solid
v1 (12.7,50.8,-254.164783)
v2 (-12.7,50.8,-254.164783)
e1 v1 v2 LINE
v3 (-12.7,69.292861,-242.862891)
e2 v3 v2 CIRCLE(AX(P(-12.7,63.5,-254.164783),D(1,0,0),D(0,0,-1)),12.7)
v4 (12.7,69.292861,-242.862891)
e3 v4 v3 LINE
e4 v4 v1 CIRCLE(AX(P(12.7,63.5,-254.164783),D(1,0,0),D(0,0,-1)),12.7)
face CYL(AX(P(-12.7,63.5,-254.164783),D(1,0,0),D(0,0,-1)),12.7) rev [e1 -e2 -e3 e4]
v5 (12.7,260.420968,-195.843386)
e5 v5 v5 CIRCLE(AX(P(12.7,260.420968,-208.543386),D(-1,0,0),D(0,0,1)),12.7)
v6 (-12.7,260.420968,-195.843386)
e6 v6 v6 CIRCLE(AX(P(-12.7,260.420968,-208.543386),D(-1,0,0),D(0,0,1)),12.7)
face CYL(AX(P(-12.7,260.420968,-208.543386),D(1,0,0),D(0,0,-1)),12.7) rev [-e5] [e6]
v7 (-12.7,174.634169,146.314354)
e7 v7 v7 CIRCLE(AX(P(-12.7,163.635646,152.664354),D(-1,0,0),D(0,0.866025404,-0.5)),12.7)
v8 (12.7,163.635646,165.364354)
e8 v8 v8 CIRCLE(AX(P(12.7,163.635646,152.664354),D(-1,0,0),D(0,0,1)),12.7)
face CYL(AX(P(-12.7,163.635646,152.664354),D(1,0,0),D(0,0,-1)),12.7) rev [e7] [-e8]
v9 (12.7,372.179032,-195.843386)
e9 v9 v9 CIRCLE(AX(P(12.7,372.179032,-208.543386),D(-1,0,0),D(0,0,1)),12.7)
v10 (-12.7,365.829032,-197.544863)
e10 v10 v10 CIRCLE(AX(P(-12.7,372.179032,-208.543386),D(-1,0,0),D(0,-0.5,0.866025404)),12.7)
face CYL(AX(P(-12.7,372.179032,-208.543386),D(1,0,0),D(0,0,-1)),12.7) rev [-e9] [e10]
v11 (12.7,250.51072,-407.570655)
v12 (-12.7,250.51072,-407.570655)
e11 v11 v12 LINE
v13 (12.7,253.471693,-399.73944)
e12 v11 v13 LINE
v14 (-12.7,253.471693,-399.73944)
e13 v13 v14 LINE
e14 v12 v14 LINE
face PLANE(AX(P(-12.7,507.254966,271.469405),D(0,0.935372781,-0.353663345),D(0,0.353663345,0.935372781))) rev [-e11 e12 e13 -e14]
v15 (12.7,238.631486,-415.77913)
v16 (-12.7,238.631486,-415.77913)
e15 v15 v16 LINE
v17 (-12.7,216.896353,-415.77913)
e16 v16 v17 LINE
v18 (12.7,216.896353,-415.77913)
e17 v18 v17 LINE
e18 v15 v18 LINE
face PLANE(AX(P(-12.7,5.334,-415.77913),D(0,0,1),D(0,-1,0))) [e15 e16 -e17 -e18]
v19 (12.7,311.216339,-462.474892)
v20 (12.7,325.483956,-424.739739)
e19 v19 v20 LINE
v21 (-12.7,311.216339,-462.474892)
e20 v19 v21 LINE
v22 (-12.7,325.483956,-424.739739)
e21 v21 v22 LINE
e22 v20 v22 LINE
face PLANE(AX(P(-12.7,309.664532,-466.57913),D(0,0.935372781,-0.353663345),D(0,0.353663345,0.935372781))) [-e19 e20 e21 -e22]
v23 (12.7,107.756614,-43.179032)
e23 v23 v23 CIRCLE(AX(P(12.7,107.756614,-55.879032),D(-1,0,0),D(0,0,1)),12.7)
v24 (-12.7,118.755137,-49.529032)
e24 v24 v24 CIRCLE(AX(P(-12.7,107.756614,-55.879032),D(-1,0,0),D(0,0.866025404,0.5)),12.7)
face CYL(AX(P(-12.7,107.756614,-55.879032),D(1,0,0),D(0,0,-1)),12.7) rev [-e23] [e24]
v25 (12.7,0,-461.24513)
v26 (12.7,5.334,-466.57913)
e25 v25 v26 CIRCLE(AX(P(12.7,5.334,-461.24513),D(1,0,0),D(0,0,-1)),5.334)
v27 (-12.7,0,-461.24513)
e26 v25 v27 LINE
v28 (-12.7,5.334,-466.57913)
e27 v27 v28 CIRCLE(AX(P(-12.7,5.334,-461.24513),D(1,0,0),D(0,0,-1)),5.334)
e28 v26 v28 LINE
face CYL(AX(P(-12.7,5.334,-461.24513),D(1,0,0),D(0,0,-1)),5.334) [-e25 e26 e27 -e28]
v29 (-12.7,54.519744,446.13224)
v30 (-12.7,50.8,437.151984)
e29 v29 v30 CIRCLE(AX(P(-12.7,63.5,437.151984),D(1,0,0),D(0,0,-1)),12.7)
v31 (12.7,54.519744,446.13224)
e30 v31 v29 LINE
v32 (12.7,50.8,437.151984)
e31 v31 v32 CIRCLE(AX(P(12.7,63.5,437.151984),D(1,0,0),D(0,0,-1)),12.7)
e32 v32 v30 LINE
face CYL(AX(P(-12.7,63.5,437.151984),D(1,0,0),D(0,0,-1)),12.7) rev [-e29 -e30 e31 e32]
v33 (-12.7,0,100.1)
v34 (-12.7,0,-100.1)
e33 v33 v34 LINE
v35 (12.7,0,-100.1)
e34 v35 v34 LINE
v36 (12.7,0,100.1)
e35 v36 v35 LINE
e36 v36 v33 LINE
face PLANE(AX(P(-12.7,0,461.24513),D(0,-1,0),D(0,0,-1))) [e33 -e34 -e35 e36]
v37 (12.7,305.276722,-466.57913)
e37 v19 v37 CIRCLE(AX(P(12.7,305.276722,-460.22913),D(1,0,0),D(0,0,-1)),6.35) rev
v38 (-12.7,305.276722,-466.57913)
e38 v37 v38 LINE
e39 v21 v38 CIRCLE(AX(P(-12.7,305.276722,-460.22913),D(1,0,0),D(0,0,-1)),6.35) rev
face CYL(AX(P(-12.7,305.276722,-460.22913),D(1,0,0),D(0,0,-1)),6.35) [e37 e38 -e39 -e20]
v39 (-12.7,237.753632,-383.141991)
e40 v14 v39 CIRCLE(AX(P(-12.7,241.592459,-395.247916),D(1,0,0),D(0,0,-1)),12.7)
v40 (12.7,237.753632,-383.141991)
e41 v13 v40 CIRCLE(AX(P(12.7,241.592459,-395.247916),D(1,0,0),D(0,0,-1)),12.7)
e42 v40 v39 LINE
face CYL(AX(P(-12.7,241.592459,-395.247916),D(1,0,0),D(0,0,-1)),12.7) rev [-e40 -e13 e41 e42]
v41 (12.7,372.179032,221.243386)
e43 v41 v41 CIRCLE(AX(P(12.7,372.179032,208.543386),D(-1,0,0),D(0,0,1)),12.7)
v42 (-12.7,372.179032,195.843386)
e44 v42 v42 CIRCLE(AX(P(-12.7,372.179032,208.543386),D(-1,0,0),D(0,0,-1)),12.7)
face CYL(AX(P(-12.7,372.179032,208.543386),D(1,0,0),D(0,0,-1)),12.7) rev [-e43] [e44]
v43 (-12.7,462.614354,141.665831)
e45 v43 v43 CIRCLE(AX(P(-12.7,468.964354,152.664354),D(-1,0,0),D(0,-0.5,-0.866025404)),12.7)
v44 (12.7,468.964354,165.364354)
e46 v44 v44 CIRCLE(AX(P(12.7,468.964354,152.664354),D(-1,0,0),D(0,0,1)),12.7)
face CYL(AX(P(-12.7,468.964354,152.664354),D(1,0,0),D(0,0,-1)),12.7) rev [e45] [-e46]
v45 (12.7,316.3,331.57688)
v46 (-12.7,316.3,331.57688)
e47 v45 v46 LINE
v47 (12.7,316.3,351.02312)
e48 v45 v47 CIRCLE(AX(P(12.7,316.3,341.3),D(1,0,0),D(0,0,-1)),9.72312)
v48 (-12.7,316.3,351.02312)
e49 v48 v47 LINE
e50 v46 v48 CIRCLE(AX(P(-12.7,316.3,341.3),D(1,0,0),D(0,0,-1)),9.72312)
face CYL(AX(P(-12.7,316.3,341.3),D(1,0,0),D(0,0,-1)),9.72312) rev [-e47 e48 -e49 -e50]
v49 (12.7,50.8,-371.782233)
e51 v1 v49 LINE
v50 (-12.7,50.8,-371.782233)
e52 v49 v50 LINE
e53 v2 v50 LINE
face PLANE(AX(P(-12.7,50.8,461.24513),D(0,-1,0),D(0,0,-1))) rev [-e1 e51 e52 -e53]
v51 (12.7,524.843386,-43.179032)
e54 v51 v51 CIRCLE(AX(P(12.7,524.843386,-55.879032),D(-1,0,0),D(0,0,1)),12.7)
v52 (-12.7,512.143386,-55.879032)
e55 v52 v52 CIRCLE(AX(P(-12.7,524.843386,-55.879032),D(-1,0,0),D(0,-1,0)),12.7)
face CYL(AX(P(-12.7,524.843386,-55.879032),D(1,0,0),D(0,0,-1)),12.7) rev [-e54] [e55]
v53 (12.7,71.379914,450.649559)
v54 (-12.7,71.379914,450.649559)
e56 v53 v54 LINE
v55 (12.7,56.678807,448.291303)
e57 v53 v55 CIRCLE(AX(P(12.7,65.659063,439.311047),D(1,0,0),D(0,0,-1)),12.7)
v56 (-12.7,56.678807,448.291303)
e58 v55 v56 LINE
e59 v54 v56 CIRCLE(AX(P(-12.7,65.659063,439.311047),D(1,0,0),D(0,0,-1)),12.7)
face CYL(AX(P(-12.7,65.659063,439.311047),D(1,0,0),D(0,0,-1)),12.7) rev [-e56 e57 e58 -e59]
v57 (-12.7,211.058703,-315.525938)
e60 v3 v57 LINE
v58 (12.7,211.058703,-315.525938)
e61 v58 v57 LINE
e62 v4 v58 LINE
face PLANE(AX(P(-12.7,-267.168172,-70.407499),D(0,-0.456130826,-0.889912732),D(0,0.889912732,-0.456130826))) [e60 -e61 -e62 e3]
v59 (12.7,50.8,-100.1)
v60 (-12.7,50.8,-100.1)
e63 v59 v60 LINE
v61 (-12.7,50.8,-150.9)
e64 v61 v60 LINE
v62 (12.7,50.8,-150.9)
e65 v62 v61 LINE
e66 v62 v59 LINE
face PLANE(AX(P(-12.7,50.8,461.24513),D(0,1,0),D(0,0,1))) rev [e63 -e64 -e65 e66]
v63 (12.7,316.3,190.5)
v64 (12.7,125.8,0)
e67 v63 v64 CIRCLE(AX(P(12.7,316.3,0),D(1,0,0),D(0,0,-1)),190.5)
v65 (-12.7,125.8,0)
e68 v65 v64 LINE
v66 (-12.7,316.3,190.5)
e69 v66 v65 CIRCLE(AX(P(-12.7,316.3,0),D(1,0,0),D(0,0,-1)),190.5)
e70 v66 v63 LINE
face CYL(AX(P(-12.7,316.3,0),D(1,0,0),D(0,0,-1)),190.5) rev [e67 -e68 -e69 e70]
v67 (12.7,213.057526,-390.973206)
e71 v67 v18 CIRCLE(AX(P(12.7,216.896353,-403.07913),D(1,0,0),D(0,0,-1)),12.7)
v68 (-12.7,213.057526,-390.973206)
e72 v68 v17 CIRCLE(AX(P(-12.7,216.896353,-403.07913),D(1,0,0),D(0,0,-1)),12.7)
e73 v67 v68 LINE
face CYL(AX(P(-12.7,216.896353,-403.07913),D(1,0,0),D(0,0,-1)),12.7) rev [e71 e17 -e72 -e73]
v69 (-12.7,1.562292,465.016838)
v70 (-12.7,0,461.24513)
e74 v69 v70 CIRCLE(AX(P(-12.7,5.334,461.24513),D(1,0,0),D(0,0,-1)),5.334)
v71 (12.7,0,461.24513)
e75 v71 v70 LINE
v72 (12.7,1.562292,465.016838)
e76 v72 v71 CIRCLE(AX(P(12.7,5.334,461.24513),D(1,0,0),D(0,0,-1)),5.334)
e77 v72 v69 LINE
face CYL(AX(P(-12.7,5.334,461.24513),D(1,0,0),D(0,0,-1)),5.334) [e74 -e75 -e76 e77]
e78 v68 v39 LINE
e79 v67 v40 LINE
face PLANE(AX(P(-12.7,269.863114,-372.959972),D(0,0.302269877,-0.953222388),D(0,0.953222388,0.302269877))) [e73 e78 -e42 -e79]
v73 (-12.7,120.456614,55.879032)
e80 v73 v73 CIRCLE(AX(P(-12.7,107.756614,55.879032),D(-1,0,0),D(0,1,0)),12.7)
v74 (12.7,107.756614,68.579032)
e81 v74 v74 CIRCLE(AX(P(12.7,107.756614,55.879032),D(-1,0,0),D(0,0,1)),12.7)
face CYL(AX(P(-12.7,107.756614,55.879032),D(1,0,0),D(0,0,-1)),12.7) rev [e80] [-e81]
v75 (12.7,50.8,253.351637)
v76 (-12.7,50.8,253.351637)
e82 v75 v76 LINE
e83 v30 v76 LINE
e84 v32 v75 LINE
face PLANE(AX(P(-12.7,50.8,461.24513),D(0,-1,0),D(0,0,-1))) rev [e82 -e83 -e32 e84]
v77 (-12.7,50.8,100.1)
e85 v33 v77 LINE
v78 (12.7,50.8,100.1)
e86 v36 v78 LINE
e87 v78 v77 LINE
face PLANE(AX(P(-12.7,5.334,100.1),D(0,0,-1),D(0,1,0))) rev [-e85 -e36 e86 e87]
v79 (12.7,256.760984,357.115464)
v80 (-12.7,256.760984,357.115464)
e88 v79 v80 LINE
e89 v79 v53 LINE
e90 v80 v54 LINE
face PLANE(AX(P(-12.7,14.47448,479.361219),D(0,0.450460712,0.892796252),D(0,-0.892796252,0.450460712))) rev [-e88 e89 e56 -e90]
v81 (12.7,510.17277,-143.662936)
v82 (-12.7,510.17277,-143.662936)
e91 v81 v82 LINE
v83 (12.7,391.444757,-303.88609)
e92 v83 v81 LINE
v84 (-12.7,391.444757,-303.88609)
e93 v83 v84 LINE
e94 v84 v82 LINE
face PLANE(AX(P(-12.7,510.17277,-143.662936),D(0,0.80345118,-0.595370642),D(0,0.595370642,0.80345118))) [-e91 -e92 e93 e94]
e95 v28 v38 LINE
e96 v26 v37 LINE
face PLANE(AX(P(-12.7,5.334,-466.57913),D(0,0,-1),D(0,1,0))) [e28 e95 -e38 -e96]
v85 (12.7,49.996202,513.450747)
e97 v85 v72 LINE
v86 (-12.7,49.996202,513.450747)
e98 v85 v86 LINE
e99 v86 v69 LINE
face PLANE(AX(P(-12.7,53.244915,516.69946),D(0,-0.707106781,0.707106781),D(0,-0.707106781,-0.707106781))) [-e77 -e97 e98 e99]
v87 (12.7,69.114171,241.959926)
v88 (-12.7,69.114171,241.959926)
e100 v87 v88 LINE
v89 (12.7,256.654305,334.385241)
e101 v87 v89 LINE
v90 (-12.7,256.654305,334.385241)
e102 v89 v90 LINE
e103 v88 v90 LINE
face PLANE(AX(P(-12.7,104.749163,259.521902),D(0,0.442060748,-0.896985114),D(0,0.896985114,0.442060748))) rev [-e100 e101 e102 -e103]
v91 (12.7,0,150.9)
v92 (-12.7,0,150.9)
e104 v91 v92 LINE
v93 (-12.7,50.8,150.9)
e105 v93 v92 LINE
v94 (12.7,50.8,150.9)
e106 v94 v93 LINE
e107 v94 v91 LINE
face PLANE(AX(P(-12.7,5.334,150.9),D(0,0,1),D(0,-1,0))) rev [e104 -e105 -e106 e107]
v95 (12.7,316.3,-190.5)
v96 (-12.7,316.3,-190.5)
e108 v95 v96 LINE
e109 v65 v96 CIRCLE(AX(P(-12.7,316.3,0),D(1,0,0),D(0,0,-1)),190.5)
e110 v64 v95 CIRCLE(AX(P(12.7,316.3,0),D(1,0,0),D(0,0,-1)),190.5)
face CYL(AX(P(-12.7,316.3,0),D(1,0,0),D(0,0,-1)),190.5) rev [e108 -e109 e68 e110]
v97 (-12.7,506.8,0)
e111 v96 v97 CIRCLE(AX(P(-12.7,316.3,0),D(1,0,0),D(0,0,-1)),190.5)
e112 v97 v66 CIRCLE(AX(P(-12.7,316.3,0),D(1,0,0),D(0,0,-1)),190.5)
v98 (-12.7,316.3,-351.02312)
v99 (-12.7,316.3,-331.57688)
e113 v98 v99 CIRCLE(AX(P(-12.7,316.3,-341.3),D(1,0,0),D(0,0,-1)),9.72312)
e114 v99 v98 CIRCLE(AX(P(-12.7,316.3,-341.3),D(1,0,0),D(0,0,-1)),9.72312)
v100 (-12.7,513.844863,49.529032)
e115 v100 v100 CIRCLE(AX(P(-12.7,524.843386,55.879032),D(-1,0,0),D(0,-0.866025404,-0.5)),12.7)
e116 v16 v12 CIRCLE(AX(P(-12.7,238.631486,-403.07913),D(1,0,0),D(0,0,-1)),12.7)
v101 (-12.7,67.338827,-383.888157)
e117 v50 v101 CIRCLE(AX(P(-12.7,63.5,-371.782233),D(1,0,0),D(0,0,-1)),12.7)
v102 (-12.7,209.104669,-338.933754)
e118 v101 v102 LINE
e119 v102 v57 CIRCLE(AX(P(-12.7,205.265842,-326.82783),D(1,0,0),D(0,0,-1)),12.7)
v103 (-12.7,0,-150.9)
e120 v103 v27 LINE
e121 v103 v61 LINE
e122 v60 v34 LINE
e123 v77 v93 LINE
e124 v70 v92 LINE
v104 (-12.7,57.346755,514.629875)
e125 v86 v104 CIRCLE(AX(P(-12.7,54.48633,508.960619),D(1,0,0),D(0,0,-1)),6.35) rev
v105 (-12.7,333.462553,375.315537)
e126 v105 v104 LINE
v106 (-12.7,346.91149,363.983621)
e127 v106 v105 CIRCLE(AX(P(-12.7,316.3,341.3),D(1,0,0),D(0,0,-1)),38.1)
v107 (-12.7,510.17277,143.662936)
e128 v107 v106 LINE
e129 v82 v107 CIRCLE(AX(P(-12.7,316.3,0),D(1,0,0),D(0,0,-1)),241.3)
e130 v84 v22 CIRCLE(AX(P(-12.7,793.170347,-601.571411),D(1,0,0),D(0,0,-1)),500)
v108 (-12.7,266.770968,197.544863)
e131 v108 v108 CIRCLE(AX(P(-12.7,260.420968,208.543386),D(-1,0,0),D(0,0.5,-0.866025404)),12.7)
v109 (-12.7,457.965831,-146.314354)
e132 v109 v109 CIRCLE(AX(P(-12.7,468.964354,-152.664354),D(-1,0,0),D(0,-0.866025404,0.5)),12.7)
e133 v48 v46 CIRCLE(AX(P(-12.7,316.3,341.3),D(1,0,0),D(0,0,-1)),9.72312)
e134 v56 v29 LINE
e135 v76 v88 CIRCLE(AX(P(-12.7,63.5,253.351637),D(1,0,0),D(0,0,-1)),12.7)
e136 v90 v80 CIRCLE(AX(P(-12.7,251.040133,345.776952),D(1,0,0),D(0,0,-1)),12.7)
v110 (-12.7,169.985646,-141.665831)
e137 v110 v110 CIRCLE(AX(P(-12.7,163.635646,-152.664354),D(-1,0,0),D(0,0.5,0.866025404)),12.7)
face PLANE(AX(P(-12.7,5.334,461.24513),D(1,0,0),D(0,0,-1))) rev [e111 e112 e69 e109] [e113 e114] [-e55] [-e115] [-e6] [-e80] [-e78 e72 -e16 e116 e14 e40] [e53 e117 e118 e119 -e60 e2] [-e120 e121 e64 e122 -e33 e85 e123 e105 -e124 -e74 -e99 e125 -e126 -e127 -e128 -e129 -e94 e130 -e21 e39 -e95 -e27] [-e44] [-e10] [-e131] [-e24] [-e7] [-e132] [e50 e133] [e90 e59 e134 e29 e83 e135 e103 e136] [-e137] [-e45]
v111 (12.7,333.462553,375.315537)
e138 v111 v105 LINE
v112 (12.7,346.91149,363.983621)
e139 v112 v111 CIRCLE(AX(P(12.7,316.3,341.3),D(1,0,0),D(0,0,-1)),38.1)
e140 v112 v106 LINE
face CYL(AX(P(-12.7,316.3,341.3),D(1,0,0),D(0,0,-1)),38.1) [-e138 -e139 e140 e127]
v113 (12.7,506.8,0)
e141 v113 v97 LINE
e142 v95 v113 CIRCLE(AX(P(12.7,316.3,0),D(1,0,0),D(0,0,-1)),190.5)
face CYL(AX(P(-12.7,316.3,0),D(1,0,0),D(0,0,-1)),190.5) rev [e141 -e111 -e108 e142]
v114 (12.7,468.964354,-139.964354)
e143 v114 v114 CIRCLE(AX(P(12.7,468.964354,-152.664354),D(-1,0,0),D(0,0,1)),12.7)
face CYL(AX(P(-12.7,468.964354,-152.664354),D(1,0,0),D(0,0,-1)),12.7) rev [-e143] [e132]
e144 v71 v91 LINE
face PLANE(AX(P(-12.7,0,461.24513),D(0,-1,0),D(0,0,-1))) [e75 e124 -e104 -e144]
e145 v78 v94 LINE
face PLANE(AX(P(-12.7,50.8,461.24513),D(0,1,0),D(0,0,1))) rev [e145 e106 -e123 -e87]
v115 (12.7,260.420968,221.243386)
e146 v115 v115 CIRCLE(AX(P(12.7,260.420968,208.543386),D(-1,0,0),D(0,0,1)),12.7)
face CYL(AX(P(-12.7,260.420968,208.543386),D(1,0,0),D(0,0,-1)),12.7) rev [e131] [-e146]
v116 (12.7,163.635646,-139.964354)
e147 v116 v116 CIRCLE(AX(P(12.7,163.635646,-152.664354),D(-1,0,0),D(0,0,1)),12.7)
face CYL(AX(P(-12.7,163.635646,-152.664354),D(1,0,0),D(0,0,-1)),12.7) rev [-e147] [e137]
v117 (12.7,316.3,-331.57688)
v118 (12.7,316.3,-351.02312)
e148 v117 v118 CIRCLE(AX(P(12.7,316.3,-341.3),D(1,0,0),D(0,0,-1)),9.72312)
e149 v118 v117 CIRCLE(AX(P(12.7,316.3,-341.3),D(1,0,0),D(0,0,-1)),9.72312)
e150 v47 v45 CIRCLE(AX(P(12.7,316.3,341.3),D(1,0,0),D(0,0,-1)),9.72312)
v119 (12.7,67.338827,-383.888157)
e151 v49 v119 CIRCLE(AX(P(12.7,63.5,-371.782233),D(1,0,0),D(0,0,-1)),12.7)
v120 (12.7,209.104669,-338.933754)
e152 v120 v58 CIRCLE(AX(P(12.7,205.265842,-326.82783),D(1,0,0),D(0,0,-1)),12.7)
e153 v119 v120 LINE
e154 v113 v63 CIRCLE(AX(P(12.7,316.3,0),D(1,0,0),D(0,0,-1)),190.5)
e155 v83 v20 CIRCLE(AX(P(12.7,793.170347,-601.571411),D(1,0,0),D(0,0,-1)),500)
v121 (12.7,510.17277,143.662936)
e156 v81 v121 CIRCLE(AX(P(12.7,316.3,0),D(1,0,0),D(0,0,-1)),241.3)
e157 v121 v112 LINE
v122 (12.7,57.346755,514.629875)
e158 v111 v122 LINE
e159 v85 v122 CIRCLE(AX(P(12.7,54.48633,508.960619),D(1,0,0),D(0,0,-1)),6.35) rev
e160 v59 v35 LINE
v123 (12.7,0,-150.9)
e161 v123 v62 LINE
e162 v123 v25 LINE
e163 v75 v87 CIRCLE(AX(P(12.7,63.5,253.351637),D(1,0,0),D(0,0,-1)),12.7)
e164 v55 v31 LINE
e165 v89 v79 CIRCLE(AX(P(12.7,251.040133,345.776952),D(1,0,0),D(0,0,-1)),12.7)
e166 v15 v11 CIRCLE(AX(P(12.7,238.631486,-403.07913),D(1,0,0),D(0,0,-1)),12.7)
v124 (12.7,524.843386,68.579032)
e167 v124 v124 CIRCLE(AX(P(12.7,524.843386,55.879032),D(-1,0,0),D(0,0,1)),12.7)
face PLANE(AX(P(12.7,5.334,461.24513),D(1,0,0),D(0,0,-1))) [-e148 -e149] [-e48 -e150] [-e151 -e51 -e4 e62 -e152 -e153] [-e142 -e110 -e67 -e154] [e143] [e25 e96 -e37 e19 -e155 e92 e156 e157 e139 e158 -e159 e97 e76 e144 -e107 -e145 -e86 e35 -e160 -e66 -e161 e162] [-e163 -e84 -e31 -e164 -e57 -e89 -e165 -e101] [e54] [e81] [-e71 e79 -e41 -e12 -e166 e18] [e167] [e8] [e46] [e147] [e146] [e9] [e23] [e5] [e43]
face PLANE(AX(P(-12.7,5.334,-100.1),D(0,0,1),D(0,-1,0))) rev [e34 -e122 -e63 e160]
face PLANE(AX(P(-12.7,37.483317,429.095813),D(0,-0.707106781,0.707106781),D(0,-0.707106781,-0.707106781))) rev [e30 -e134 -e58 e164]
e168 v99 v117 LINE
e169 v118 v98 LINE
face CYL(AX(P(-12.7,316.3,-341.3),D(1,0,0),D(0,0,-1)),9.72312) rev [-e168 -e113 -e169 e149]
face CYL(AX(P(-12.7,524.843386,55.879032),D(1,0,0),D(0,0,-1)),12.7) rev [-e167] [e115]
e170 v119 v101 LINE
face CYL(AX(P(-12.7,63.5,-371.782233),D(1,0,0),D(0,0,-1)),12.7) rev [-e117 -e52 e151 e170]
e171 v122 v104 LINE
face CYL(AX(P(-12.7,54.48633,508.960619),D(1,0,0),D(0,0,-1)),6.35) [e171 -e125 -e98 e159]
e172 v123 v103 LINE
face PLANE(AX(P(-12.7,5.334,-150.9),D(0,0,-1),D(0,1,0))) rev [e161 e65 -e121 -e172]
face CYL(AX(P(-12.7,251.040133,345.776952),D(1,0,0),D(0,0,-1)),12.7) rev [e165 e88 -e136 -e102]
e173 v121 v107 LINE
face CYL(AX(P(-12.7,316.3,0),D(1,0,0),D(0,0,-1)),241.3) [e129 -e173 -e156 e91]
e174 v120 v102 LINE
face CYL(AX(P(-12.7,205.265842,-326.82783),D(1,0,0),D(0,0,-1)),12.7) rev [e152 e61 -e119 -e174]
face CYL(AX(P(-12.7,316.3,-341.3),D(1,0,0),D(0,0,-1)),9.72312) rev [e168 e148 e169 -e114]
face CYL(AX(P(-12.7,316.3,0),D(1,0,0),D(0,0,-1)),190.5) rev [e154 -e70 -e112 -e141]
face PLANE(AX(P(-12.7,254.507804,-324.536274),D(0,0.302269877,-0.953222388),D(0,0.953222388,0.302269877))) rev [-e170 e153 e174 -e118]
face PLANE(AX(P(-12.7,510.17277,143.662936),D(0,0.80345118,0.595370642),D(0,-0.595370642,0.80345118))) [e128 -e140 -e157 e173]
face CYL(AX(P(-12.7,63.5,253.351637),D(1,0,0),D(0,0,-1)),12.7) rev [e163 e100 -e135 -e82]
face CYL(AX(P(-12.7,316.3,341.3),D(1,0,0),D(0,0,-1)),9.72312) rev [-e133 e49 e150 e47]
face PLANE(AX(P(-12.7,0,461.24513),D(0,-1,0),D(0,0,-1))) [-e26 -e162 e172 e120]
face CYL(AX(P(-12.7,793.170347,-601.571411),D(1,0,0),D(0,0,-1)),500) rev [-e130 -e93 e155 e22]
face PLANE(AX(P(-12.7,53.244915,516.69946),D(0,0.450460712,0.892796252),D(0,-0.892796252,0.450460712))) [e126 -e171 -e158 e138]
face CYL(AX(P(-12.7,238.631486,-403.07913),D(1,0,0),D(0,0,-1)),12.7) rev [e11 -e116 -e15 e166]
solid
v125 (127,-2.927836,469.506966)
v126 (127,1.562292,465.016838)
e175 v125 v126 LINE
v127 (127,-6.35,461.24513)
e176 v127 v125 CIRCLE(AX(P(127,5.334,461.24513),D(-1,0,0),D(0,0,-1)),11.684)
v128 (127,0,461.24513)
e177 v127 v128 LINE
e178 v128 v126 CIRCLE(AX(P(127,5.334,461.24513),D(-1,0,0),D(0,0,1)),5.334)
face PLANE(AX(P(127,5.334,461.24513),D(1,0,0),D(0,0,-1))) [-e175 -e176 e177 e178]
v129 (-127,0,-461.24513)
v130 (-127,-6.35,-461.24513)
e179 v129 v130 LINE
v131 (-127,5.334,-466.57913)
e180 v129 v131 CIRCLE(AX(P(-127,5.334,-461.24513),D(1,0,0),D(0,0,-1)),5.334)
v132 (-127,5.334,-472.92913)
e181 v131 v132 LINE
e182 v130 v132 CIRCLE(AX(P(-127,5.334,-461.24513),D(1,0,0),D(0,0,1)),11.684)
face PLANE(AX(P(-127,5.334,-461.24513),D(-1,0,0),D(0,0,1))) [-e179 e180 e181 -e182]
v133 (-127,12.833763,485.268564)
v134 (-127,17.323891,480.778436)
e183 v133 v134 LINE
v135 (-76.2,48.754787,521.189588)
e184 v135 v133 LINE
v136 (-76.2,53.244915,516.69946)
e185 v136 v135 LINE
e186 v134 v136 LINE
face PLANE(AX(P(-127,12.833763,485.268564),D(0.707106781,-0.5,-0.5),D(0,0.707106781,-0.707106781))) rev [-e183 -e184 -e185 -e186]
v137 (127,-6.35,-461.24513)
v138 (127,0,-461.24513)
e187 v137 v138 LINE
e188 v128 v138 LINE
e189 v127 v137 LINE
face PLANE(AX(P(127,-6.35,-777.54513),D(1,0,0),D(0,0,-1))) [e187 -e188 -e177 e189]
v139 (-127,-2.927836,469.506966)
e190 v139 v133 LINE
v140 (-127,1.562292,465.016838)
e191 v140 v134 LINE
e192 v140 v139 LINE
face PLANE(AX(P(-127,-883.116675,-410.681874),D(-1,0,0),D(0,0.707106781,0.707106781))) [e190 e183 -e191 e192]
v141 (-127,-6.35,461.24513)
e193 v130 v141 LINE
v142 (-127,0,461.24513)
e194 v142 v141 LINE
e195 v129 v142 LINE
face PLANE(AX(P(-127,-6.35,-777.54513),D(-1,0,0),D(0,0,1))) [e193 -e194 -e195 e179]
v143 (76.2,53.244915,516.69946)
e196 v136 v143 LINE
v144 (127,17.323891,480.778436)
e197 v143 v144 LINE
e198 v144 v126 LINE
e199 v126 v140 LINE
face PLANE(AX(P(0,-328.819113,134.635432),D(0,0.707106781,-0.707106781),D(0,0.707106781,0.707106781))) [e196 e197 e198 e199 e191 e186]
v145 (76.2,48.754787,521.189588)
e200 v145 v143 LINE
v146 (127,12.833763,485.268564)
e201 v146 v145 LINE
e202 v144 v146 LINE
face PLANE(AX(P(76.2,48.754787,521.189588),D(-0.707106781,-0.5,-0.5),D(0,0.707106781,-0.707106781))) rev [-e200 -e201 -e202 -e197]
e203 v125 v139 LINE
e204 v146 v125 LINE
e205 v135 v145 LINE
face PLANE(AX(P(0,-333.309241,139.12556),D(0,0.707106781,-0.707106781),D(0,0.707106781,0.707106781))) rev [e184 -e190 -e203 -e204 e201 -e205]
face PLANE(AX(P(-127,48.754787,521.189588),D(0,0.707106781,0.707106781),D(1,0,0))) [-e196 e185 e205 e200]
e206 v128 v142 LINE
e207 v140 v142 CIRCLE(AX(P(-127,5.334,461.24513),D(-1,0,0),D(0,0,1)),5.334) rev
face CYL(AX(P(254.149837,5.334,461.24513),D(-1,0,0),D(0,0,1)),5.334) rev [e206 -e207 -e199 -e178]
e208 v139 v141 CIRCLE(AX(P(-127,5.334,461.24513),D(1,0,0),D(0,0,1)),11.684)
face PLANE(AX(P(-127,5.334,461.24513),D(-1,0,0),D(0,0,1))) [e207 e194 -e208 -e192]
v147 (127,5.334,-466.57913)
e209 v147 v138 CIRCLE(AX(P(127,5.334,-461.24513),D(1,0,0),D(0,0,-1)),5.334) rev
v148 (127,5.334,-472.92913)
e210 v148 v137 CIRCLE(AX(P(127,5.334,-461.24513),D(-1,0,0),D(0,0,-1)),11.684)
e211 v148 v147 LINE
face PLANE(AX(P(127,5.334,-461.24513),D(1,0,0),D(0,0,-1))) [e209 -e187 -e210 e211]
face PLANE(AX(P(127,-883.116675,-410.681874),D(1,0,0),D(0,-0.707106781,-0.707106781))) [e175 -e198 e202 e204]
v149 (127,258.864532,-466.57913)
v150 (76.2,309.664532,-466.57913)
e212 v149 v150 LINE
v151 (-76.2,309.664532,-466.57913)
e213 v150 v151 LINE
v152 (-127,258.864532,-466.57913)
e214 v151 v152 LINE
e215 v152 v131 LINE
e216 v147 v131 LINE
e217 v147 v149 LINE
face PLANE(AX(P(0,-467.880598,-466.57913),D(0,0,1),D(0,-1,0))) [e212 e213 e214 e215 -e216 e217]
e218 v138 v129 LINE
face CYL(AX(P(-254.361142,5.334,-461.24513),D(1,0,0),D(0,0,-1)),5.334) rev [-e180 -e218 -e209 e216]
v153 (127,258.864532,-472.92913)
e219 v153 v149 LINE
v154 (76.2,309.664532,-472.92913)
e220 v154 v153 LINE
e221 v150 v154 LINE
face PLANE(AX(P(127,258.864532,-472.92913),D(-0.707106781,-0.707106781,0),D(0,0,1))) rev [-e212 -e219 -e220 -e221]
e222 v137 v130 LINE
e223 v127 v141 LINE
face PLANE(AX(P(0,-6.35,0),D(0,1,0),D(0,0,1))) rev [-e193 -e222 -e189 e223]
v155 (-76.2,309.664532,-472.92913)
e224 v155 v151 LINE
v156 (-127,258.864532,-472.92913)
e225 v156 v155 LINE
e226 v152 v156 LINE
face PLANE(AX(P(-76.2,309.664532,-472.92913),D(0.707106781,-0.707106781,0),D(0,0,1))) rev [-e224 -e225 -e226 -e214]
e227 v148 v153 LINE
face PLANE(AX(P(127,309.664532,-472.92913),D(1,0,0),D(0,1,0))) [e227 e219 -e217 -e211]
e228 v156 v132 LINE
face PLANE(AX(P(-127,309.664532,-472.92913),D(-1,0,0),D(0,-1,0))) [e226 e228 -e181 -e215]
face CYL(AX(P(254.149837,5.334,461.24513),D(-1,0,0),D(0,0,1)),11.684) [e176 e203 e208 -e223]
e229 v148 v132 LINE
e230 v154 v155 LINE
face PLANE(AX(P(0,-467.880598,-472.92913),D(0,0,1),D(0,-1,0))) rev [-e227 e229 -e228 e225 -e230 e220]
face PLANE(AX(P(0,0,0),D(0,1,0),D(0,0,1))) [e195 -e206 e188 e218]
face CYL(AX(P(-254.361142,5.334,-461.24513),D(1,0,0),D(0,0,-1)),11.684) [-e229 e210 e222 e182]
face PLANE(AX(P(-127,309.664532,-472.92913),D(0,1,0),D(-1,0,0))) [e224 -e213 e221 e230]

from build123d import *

# Parameters (mm, degrees)
SKETCH5_W                            = 254
SKETCH5_H                            = 1317.865260112
BASE_SKID_DEPTH                      = 6.35
BEND_START                           = -127
BEND_HEEL_DEPTH                      = 254
BEND_HEEL_2_DEPTH                    = 254
BEND_TOE_DEPTH                       = 254
BEND_TOE_2_DEPTH                     = 254
SILHOUETTE_DEPTH                     = 12.7
MANIFOLD_BORE_DEPTH                  = 774.747599071
MANIFOLD_BORE_DEPTH_BACK             = 774.747599071
FLANGE_PATTERN_R                     = 190.5
SKETCH3_W                            = 12.7
SKETCH3_H                            = 139.7
BOLT_PATTERN_COUNT                   = 12
SKETCH21_W                           = 9.72312
SKETCH21_H                           = 139.7
BEAM_START                           = -12.7
CROSSBRACE_W                         = 50.8
CROSSBRACE_H                         = 50.8
BEAM_CHANNELS_DEPTH                  = 25.4
WEBS_DEPTH                           = 774.747599071
WEBS_DEPTH_BACK                      = 774.747599071
WEBS_FILLET_R                        = 12.7
EDGE_FILLET_R                        = 6.35
SPINE_FILLET_R                       = 500
SKID_START                           = -374.774748962
SKID_EDGES_OUTLINE_W                 = 201
SKID_EDGES_OUTLINE_H                 = 6.35
SKID_EDGES_DEPTH                     = 35.921024484
SKID_START_2                         = 338.853724478
SKID_EDGES_2_OUTLINE_W               = 200
SKID_EDGES_2_OUTLINE_H               = 6.35
SKID_EDGES_2_DEPTH                   = 35.921024484
SKID_START_3                         = -308.768451674
SKID_EDGES_3_OUTLINE_W               = 200
SKID_EDGES_3_OUTLINE_H               = 9
SKID_EDGES_3_DEPTH                   = 35.921024485
SKID_START_4                         = 272.847427189
SKID_EDGES_4_OUTLINE_W               = 201
SKID_EDGES_4_OUTLINE_H               = 9
SKID_EDGES_4_DEPTH                   = 35.921024485
CONVERT_START                        = -12.7
CONVERT_PROFILE_TO_SHEET_OUTLINE_R   = 12.7
CONVERT_PROFILE_TO_SHEET_OUTLINE_R_2 = 9.72312
CONVERT_PROFILE_TO_SHEET_OUTLINE_R_3 = 190.5
CONVERT_PROFILE_TO_SHEET_DEPTH       = 25.4


# Read off the part's stored shape, not the designer's step: Bend Heel, Bend Toe, Skid Edges, Convert Profile to Sheet
# Sheet-metal steps are written as plain solids
with BuildPart() as part:
    # Sketch5 → Base Skid (new body)
    with BuildSketch(Plane(origin=(0, 0, 0), x_dir=(1, 0, 0), z_dir=(0, 1, 0))):
        with Locations((0, 118.6125)):
            Rectangle(SKETCH5_W, SKETCH5_H)
    extrude(amount=-BASE_SKID_DEPTH)

    # Bend Heel outline → Bend Heel (cut)
    with BuildSketch(Plane.YZ.offset(BEND_START)):
        with BuildLine():
            Line((0, -777.545130056), (0, -471.640528076))
            ThreePointArc((0, -471.640528076), (-4.636915504, -467.33583609), (-6.35, -461.245130056))
            Line((-6.35, -461.245130056), (-6.35, -777.545130056))
            Line((-6.35, -777.545130056), (0, -777.545130056))
        make_face()
    extrude(amount=BEND_HEEL_DEPTH, mode=Mode.SUBTRACT)

    # Bend Heel 2 outline → Bend Heel 2 (add)
    with BuildSketch(Plane.YZ.offset(BEND_START)):
        with BuildLine():
            Line((5.334, -472.929130056), (309.66453199, -472.929130056))
            Line((309.66453199, -472.929130056), (309.66453199, -466.579130056))
            Line((309.66453199, -466.579130056), (5.334, -466.579130056))
            ThreePointArc((5.334, -466.579130056), (1.56229243, -465.016837626), (0, -461.245130056))
            Line((0, -461.245130056), (0, -471.640528076))
            ThreePointArc((0, -471.640528076), (2.590277571, -472.602411563), (5.334, -472.929130056))
        make_face()
    extrude(amount=BEND_HEEL_2_DEPTH)

    # Bend Toe outline → Bend Toe (cut)
    with BuildSketch(Plane.YZ.offset(BEND_START)):
        with BuildLine():
            Line((-6.35, 540.320130056), (-6.35, 461.245130056))
            ThreePointArc((-6.35, 461.245130056), (-5.460608458, 465.71640328), (-2.927835631, 469.506965687))
            Line((-2.927835631, 469.506965687), (0, 472.434801318))
            Line((0, 472.434801318), (0, 540.320130056))
            Line((0, 540.320130056), (-6.35, 540.320130056))
        make_face()
    extrude(amount=BEND_TOE_DEPTH, mode=Mode.SUBTRACT)

    # Bend Toe 2 outline → Bend Toe 2 (add)
    with BuildSketch(Plane.YZ.offset(BEND_START)):
        with BuildLine():
            Line((48.754787092, 521.189588411), (0, 472.434801318))
            Line((0, 472.434801318), (0, 461.245130056))
            ThreePointArc((0, 461.245130056), (0.406026574, 463.286363484), (1.562292429, 465.016837626))
            Line((1.562292429, 465.016837626), (53.244915153, 516.69946035))
            Line((53.244915153, 516.69946035), (48.754787092, 521.189588411))
        make_face()
    extrude(amount=BEND_TOE_2_DEPTH)

    # Skid Edges outline → Skid Edges (cut)
    with BuildSketch(Plane(origin=(0, 0, 0), x_dir=(0.7071067811865501, 0.4999999999999991, 0.499999999999997), z_dir=(0.7071067811865449, -0.5000000000000029, -0.5000000000000008)).offset(SKID_START)):
        with Locations((258.5, 330.886851681)):
            Rectangle(SKID_EDGES_OUTLINE_W, SKID_EDGES_OUTLINE_H)
    extrude(amount=SKID_EDGES_DEPTH, mode=Mode.SUBTRACT)

    # Skid Edges 2 outline → Skid Edges 2 (cut)
    with BuildSketch(Plane(origin=(0, 0, 0), x_dir=(0.7071067811865501, -0.4999999999999991, -0.499999999999997), z_dir=(0.7071067811865449, 0.5000000000000029, 0.5000000000000008)).offset(SKID_START_2)):
        with Locations((-258, -330.886851681)):
            Rectangle(SKID_EDGES_2_OUTLINE_W, SKID_EDGES_2_OUTLINE_H)
    extrude(amount=SKID_EDGES_2_DEPTH, mode=Mode.SUBTRACT)

    # Skid Edges 3 outline → Skid Edges 3 (cut)
    with BuildSketch(Plane(origin=(0, 0, 0), x_dir=(0.7071067811865474, 0.7071067811865477, 0), z_dir=(0.7071067811865476, -0.7071067811865476, 0)).offset(SKID_START_3)):
        with Locations((192, -469.5)):
            Rectangle(SKID_EDGES_3_OUTLINE_W, SKID_EDGES_3_OUTLINE_H)
    extrude(amount=SKID_EDGES_3_DEPTH, mode=Mode.SUBTRACT)

    # Skid Edges 4 outline → Skid Edges 4 (cut)
    with BuildSketch(Plane(origin=(0, 0, 0), x_dir=(0.707106781186548, -0.707106781186547, 0), z_dir=(0.707106781186547, 0.707106781186548, 0)).offset(SKID_START_4)):
        with Locations((-192.5, 469.5)):
            Rectangle(SKID_EDGES_4_OUTLINE_W, SKID_EDGES_4_OUTLINE_H)
    extrude(amount=SKID_EDGES_4_DEPTH, mode=Mode.SUBTRACT)


with BuildPart() as body_2:
    # profile → Silhouette (new, symmetric)
    with BuildSketch(Plane(origin=(0, 0, 0), x_dir=(0, 0, -1), z_dir=(1, 0, 0))):
        with BuildLine():
            Line((-516.69946035, 53.244915153), (-375.315537192, 333.462553119))
            ThreePointArc((-375.315537192, 333.462553119), (-370.436182371, 340.849804008), (-363.983621447, 346.911489968))
            Line((-363.983621447, 346.911489968), (-143.662935834, 510.172769794))
            ThreePointArc((-143.662935834, 510.172769794), (0, 557.6), (143.662935834, 510.172769794))
            Line((143.662935834, 510.172769794), (359.728434803, 350.0646538))
            Line((359.728434803, 350.0646538), (466.579130056, 309.66453199))
            Line((466.579130056, 309.66453199), (466.579130056, 5.334))
            ThreePointArc((466.579130056, 5.334), (465.016837626, 1.562292429), (461.245130056, 0))
            Line((461.245130056, 0), (-461.245130056, 0))
            ThreePointArc((-461.245130056, 0), (-463.286363484, 0.406026574), (-465.016837626, 1.562292429))
            Line((-465.016837626, 1.562292429), (-516.69946035, 53.244915153))
        make_face()
    extrude(amount=SILHOUETTE_DEPTH, both=True)

    # Flange Pattern → Manifold Bore (cut, two sides: drawn at the far end of the back side and taken through both)
    with BuildSketch(Plane(origin=(0, 0, 0), x_dir=(0, 0, -1), z_dir=(1, 0, 0)).offset(-MANIFOLD_BORE_DEPTH_BACK)):
        with Locations((0, 316.3)):
            Circle(FLANGE_PATTERN_R)
    extrude(amount=MANIFOLD_BORE_DEPTH + MANIFOLD_BORE_DEPTH_BACK, mode=Mode.SUBTRACT)

    # Sketch3 → 7/8 (1) Diameter Hole1 (revolve, cut)
    with BuildSketch(Plane(origin=(12.7, 260.420968162, -208.543385896), x_dir=(0, 0, -1), z_dir=(0, 1, 0))):
        with Locations((6.35, 69.85)):
            Rectangle(SKETCH3_W, SKETCH3_H)
    f_7_8_1_diameter_hole1 = revolve(axis=Axis((19.05, 260.420968162, -208.543385896), (-1, 0, 0)), mode=Mode.SUBTRACT)

    # Bolt Pattern: 7/8 (1) Diameter Hole1 ×12 about axis
    bolt_pattern_axis = Axis((0, 316.3, 0), (1, 0, 0))
    for i in range(1, BOLT_PATTERN_COUNT):
        add(f_7_8_1_diameter_hole1.rotate(bolt_pattern_axis, i * 360 / BOLT_PATTERN_COUNT), mode=Mode.SUBTRACT)

    # Sketch21 → 3/4 (0.7656) Diameter Hole1 (revolve, cut)
    with BuildSketch(Plane(origin=(12.7, 316.3, -341.3), x_dir=(0, 0, -1), z_dir=(0, 1, 0))):
        with Locations((4.86156, 69.85)):
            Rectangle(SKETCH21_W, SKETCH21_H)
    f_3_4_0_7656_diameter_hole1 = revolve(axis=Axis((19.05, 316.3, -341.3), (-1, 0, 0)), mode=Mode.SUBTRACT)

    # Hoist Mirror: 3/4 (0.7656) Diameter Hole1 across plane
    add(f_3_4_0_7656_diameter_hole1.mirror(Plane.XY), mode=Mode.SUBTRACT)

    # Crossbrace → Beam Channels (cut)
    with BuildSketch(Plane(origin=(0, 0, 0), x_dir=(0, 0, -1), z_dir=(1, 0, 0)).offset(BEAM_START)):
        with Locations((125.5, 25.4)):
            Rectangle(CROSSBRACE_W, CROSSBRACE_H)
        with Locations((-125.5, 25.4)):
            Rectangle(CROSSBRACE_W, CROSSBRACE_H)
    extrude(amount=BEAM_CHANNELS_DEPTH, mode=Mode.SUBTRACT)

    # lightening holes → Webs (cut, two sides: drawn at the far end of the back side and taken through both)
    with BuildSketch(Plane(origin=(0, 0, 0), x_dir=(0, 0, -1), z_dir=(1, 0, 0)).offset(-WEBS_DEPTH_BACK)):
        Polygon((329.604282546, 238.525599733), (233.384249051, 50.8), (389.132672405, 50.8), align=None)
        Polygon((-442.412496229, 50.8), (-232.934161694, 50.8), (-345.643389962, 279.498206095), (-454.788729364, 63.176233135), align=None)
        Polygon((415.779130056, 134.830867543), (375.217673302, 262.743344484), (415.779130056, 247.407105541), align=None)
    extrude(amount=WEBS_DEPTH + WEBS_DEPTH_BACK, mode=Mode.SUBTRACT)

    # Webs Fillet
    webs_fillet_edges = [body_2.edges().sort_by_distance(p)[0] for p in [
        (0, 247.407105541, -415.779130056),
        (0, 134.830867543, -415.779130056),
        (0, 262.743344484, -375.217673302),
        (0, 63.176233135, 454.788729364),
        (0, 279.498206095, 345.643389962),
        (0, 50.8, 232.934161694),
        (0, 50.8, 442.412496229),
        (0, 50.8, -233.384249051),
        (0, 238.525599733, -329.604282546),
        (0, 50.8, -389.132672405),
    ]]
    fillet(webs_fillet_edges, radius=WEBS_FILLET_R)

    # Edge fillet
    edge_fillet_edges = [body_2.edges().sort_by_distance(p)[0] for p in [
        (0, 53.244915153, 516.69946035),
        (0, 309.66453199, -466.579130056),
    ]]
    fillet(edge_fillet_edges, radius=EDGE_FILLET_R)

    # Spine fillet
    spine_fillet_edges = [body_2.edges().sort_by_distance(p)[0] for p in [
        (0, 350.0646538, -359.728434803),
    ]]
    fillet(spine_fillet_edges, radius=SPINE_FILLET_R)


with BuildPart() as body_3:
    # Convert Profile to Sheet outline → Convert Profile to Sheet (new body)
    with BuildSketch(Plane.YZ.offset(CONVERT_START)):
        with BuildLine():
            Line((0, 100.1), (0, -100.1))
            Line((0, -100.1), (50.8, -100.1))
            Line((50.8, -100.1), (50.8, -150.9))
            Line((50.8, -150.9), (0, -150.9))
            Line((0, -150.9), (0, -461.245130056))
            ThreePointArc((0, -461.245130056), (1.56229243, -465.016837626), (5.334, -466.579130056))
            Line((5.334, -466.579130056), (305.276722288, -466.579130056))
            ThreePointArc((305.276722288, -466.579130056), (308.886563682, -465.453261094), (311.216339445, -462.474892295))
            Line((311.216339445, -462.474892295), (325.483956442, -424.739738848))
            ThreePointArc((325.483956442, -424.739738848), (354.284599622, -362.031642084), (391.444756589, -303.886090391))
            Line((391.444756589, -303.886090391), (510.172769794, -143.662935834))
            ThreePointArc((510.172769794, -143.662935834), (557.6, 0), (510.172769794, 143.662935834))
            Line((510.172769794, 143.662935834), (346.911489968, 363.983621447))
            ThreePointArc((346.911489968, 363.983621447), (340.849804008, 370.436182371), (333.462553119, 375.315537192))
            Line((333.462553119, 375.315537192), (57.346755421, 514.629875176))
            ThreePointArc((57.346755421, 514.629875176), (53.480562341, 515.230462007), (49.99620184, 513.450747037))
            Line((49.99620184, 513.450747037), (1.562292429, 465.016837626))
            ThreePointArc((1.562292429, 465.016837626), (0.406026574, 463.286363484), (0, 461.245130056))
            Line((0, 461.245130056), (0, 150.9))
            Line((0, 150.9), (50.8, 150.9))
            Line((50.8, 150.9), (50.8, 100.1))
            Line((50.8, 100.1), (0, 100.1))
        make_face()
        with BuildLine():
            ThreePointArc((50.8, -254.164782729), (56.877286844, -243.328285581), (69.292861488, -242.862891039))
            Line((69.292861488, -242.862891039), (211.058703387, -315.52593793))
            ThreePointArc((211.058703387, -315.52593793), (217.921821537, -327.884323534), (209.104669337, -338.933753951))
            Line((209.104669337, -338.933753951), (67.338827438, -383.888157171))
            ThreePointArc((67.338827438, -383.888157171), (55.998770383, -382.030235291), (50.8, -371.78223284))
            Line((50.8, -371.78223284), (50.8, -254.164782729))
        make_face(mode=Mode.SUBTRACT)
        with BuildLine():
            ThreePointArc((250.510720451, -407.570654534), (245.851168927, -413.527392133), (238.631486139, -415.779130056))
            Line((238.631486139, -415.779130056), (216.896353438, -415.779130056))
            ThreePointArc((216.896353438, -415.779130056), (204.345751082, -405.021391753), (213.057525999, -390.973205725))
            Line((213.057525999, -390.973205725), (237.753631588, -383.141991423))
            ThreePointArc((237.753631588, -383.141991423), (250.813677082, -386.515267955), (253.47169334, -399.739440232))
            Line((253.47169334, -399.739440232), (250.510720451, -407.570654534))
        make_face(mode=Mode.SUBTRACT)
        with Locations((107.756614104, -55.879031838)):
            Circle(CONVERT_PROFILE_TO_SHEET_OUTLINE_R, mode=Mode.SUBTRACT)
        with Locations((163.635645942, -152.664354058)):
            Circle(CONVERT_PROFILE_TO_SHEET_OUTLINE_R, mode=Mode.SUBTRACT)
        with Locations((260.420968162, -208.543385896)):
            Circle(CONVERT_PROFILE_TO_SHEET_OUTLINE_R, mode=Mode.SUBTRACT)
        with Locations((316.3, -341.3)):
            Circle(CONVERT_PROFILE_TO_SHEET_OUTLINE_R_2, mode=Mode.SUBTRACT)
        with Locations((372.179031838, -208.543385896)):
            Circle(CONVERT_PROFILE_TO_SHEET_OUTLINE_R, mode=Mode.SUBTRACT)
        with Locations((316.3, 0)):
            Circle(CONVERT_PROFILE_TO_SHEET_OUTLINE_R_3, mode=Mode.SUBTRACT)
        with Locations((468.964354058, -152.664354058)):
            Circle(CONVERT_PROFILE_TO_SHEET_OUTLINE_R, mode=Mode.SUBTRACT)
        with Locations((524.843385896, -55.879031838)):
            Circle(CONVERT_PROFILE_TO_SHEET_OUTLINE_R, mode=Mode.SUBTRACT)
        with Locations((107.756614104, 55.879031838)):
            Circle(CONVERT_PROFILE_TO_SHEET_OUTLINE_R, mode=Mode.SUBTRACT)
        with Locations((163.635645942, 152.664354058)):
            Circle(CONVERT_PROFILE_TO_SHEET_OUTLINE_R, mode=Mode.SUBTRACT)
        with Locations((260.420968162, 208.543385896)):
            Circle(CONVERT_PROFILE_TO_SHEET_OUTLINE_R, mode=Mode.SUBTRACT)
        with BuildLine():
            Line((71.379913671, 450.649559015), (256.760984496, 357.115464363))
            ThreePointArc((256.760984496, 357.115464363), (263.739993588, 345.717347832), (256.654304954, 334.385241014))
            Line((256.654304954, 334.385241014), (69.114171497, 241.959926132))
            ThreePointArc((69.114171497, 241.959926132), (56.792167936, 242.567621644), (50.8, 253.351637084))
            Line((50.8, 253.351637084), (50.8, 437.151983987))
            ThreePointArc((50.8, 437.151983987), (51.766729937, 442.012063578), (54.519743879, 446.132240108))
            Line((54.519743879, 446.132240108), (56.67880651, 448.291302739))
            ThreePointArc((56.67880651, 448.291302739), (63.647527512, 451.850732677), (71.379913671, 450.649559015))
        make_face(mode=Mode.SUBTRACT)
        with Locations((372.179031838, 208.543385896)):
            Circle(CONVERT_PROFILE_TO_SHEET_OUTLINE_R, mode=Mode.SUBTRACT)
        with Locations((524.843385896, 55.879031838)):
            Circle(CONVERT_PROFILE_TO_SHEET_OUTLINE_R, mode=Mode.SUBTRACT)
        with Locations((468.964354058, 152.664354058)):
            Circle(CONVERT_PROFILE_TO_SHEET_OUTLINE_R, mode=Mode.SUBTRACT)
        with Locations((316.3, 341.3)):
            Circle(CONVERT_PROFILE_TO_SHEET_OUTLINE_R_2, mode=Mode.SUBTRACT)
    extrude(amount=CONVERT_PROFILE_TO_SHEET_DEPTH)


solid = Compound([part.part, body_3.part])
